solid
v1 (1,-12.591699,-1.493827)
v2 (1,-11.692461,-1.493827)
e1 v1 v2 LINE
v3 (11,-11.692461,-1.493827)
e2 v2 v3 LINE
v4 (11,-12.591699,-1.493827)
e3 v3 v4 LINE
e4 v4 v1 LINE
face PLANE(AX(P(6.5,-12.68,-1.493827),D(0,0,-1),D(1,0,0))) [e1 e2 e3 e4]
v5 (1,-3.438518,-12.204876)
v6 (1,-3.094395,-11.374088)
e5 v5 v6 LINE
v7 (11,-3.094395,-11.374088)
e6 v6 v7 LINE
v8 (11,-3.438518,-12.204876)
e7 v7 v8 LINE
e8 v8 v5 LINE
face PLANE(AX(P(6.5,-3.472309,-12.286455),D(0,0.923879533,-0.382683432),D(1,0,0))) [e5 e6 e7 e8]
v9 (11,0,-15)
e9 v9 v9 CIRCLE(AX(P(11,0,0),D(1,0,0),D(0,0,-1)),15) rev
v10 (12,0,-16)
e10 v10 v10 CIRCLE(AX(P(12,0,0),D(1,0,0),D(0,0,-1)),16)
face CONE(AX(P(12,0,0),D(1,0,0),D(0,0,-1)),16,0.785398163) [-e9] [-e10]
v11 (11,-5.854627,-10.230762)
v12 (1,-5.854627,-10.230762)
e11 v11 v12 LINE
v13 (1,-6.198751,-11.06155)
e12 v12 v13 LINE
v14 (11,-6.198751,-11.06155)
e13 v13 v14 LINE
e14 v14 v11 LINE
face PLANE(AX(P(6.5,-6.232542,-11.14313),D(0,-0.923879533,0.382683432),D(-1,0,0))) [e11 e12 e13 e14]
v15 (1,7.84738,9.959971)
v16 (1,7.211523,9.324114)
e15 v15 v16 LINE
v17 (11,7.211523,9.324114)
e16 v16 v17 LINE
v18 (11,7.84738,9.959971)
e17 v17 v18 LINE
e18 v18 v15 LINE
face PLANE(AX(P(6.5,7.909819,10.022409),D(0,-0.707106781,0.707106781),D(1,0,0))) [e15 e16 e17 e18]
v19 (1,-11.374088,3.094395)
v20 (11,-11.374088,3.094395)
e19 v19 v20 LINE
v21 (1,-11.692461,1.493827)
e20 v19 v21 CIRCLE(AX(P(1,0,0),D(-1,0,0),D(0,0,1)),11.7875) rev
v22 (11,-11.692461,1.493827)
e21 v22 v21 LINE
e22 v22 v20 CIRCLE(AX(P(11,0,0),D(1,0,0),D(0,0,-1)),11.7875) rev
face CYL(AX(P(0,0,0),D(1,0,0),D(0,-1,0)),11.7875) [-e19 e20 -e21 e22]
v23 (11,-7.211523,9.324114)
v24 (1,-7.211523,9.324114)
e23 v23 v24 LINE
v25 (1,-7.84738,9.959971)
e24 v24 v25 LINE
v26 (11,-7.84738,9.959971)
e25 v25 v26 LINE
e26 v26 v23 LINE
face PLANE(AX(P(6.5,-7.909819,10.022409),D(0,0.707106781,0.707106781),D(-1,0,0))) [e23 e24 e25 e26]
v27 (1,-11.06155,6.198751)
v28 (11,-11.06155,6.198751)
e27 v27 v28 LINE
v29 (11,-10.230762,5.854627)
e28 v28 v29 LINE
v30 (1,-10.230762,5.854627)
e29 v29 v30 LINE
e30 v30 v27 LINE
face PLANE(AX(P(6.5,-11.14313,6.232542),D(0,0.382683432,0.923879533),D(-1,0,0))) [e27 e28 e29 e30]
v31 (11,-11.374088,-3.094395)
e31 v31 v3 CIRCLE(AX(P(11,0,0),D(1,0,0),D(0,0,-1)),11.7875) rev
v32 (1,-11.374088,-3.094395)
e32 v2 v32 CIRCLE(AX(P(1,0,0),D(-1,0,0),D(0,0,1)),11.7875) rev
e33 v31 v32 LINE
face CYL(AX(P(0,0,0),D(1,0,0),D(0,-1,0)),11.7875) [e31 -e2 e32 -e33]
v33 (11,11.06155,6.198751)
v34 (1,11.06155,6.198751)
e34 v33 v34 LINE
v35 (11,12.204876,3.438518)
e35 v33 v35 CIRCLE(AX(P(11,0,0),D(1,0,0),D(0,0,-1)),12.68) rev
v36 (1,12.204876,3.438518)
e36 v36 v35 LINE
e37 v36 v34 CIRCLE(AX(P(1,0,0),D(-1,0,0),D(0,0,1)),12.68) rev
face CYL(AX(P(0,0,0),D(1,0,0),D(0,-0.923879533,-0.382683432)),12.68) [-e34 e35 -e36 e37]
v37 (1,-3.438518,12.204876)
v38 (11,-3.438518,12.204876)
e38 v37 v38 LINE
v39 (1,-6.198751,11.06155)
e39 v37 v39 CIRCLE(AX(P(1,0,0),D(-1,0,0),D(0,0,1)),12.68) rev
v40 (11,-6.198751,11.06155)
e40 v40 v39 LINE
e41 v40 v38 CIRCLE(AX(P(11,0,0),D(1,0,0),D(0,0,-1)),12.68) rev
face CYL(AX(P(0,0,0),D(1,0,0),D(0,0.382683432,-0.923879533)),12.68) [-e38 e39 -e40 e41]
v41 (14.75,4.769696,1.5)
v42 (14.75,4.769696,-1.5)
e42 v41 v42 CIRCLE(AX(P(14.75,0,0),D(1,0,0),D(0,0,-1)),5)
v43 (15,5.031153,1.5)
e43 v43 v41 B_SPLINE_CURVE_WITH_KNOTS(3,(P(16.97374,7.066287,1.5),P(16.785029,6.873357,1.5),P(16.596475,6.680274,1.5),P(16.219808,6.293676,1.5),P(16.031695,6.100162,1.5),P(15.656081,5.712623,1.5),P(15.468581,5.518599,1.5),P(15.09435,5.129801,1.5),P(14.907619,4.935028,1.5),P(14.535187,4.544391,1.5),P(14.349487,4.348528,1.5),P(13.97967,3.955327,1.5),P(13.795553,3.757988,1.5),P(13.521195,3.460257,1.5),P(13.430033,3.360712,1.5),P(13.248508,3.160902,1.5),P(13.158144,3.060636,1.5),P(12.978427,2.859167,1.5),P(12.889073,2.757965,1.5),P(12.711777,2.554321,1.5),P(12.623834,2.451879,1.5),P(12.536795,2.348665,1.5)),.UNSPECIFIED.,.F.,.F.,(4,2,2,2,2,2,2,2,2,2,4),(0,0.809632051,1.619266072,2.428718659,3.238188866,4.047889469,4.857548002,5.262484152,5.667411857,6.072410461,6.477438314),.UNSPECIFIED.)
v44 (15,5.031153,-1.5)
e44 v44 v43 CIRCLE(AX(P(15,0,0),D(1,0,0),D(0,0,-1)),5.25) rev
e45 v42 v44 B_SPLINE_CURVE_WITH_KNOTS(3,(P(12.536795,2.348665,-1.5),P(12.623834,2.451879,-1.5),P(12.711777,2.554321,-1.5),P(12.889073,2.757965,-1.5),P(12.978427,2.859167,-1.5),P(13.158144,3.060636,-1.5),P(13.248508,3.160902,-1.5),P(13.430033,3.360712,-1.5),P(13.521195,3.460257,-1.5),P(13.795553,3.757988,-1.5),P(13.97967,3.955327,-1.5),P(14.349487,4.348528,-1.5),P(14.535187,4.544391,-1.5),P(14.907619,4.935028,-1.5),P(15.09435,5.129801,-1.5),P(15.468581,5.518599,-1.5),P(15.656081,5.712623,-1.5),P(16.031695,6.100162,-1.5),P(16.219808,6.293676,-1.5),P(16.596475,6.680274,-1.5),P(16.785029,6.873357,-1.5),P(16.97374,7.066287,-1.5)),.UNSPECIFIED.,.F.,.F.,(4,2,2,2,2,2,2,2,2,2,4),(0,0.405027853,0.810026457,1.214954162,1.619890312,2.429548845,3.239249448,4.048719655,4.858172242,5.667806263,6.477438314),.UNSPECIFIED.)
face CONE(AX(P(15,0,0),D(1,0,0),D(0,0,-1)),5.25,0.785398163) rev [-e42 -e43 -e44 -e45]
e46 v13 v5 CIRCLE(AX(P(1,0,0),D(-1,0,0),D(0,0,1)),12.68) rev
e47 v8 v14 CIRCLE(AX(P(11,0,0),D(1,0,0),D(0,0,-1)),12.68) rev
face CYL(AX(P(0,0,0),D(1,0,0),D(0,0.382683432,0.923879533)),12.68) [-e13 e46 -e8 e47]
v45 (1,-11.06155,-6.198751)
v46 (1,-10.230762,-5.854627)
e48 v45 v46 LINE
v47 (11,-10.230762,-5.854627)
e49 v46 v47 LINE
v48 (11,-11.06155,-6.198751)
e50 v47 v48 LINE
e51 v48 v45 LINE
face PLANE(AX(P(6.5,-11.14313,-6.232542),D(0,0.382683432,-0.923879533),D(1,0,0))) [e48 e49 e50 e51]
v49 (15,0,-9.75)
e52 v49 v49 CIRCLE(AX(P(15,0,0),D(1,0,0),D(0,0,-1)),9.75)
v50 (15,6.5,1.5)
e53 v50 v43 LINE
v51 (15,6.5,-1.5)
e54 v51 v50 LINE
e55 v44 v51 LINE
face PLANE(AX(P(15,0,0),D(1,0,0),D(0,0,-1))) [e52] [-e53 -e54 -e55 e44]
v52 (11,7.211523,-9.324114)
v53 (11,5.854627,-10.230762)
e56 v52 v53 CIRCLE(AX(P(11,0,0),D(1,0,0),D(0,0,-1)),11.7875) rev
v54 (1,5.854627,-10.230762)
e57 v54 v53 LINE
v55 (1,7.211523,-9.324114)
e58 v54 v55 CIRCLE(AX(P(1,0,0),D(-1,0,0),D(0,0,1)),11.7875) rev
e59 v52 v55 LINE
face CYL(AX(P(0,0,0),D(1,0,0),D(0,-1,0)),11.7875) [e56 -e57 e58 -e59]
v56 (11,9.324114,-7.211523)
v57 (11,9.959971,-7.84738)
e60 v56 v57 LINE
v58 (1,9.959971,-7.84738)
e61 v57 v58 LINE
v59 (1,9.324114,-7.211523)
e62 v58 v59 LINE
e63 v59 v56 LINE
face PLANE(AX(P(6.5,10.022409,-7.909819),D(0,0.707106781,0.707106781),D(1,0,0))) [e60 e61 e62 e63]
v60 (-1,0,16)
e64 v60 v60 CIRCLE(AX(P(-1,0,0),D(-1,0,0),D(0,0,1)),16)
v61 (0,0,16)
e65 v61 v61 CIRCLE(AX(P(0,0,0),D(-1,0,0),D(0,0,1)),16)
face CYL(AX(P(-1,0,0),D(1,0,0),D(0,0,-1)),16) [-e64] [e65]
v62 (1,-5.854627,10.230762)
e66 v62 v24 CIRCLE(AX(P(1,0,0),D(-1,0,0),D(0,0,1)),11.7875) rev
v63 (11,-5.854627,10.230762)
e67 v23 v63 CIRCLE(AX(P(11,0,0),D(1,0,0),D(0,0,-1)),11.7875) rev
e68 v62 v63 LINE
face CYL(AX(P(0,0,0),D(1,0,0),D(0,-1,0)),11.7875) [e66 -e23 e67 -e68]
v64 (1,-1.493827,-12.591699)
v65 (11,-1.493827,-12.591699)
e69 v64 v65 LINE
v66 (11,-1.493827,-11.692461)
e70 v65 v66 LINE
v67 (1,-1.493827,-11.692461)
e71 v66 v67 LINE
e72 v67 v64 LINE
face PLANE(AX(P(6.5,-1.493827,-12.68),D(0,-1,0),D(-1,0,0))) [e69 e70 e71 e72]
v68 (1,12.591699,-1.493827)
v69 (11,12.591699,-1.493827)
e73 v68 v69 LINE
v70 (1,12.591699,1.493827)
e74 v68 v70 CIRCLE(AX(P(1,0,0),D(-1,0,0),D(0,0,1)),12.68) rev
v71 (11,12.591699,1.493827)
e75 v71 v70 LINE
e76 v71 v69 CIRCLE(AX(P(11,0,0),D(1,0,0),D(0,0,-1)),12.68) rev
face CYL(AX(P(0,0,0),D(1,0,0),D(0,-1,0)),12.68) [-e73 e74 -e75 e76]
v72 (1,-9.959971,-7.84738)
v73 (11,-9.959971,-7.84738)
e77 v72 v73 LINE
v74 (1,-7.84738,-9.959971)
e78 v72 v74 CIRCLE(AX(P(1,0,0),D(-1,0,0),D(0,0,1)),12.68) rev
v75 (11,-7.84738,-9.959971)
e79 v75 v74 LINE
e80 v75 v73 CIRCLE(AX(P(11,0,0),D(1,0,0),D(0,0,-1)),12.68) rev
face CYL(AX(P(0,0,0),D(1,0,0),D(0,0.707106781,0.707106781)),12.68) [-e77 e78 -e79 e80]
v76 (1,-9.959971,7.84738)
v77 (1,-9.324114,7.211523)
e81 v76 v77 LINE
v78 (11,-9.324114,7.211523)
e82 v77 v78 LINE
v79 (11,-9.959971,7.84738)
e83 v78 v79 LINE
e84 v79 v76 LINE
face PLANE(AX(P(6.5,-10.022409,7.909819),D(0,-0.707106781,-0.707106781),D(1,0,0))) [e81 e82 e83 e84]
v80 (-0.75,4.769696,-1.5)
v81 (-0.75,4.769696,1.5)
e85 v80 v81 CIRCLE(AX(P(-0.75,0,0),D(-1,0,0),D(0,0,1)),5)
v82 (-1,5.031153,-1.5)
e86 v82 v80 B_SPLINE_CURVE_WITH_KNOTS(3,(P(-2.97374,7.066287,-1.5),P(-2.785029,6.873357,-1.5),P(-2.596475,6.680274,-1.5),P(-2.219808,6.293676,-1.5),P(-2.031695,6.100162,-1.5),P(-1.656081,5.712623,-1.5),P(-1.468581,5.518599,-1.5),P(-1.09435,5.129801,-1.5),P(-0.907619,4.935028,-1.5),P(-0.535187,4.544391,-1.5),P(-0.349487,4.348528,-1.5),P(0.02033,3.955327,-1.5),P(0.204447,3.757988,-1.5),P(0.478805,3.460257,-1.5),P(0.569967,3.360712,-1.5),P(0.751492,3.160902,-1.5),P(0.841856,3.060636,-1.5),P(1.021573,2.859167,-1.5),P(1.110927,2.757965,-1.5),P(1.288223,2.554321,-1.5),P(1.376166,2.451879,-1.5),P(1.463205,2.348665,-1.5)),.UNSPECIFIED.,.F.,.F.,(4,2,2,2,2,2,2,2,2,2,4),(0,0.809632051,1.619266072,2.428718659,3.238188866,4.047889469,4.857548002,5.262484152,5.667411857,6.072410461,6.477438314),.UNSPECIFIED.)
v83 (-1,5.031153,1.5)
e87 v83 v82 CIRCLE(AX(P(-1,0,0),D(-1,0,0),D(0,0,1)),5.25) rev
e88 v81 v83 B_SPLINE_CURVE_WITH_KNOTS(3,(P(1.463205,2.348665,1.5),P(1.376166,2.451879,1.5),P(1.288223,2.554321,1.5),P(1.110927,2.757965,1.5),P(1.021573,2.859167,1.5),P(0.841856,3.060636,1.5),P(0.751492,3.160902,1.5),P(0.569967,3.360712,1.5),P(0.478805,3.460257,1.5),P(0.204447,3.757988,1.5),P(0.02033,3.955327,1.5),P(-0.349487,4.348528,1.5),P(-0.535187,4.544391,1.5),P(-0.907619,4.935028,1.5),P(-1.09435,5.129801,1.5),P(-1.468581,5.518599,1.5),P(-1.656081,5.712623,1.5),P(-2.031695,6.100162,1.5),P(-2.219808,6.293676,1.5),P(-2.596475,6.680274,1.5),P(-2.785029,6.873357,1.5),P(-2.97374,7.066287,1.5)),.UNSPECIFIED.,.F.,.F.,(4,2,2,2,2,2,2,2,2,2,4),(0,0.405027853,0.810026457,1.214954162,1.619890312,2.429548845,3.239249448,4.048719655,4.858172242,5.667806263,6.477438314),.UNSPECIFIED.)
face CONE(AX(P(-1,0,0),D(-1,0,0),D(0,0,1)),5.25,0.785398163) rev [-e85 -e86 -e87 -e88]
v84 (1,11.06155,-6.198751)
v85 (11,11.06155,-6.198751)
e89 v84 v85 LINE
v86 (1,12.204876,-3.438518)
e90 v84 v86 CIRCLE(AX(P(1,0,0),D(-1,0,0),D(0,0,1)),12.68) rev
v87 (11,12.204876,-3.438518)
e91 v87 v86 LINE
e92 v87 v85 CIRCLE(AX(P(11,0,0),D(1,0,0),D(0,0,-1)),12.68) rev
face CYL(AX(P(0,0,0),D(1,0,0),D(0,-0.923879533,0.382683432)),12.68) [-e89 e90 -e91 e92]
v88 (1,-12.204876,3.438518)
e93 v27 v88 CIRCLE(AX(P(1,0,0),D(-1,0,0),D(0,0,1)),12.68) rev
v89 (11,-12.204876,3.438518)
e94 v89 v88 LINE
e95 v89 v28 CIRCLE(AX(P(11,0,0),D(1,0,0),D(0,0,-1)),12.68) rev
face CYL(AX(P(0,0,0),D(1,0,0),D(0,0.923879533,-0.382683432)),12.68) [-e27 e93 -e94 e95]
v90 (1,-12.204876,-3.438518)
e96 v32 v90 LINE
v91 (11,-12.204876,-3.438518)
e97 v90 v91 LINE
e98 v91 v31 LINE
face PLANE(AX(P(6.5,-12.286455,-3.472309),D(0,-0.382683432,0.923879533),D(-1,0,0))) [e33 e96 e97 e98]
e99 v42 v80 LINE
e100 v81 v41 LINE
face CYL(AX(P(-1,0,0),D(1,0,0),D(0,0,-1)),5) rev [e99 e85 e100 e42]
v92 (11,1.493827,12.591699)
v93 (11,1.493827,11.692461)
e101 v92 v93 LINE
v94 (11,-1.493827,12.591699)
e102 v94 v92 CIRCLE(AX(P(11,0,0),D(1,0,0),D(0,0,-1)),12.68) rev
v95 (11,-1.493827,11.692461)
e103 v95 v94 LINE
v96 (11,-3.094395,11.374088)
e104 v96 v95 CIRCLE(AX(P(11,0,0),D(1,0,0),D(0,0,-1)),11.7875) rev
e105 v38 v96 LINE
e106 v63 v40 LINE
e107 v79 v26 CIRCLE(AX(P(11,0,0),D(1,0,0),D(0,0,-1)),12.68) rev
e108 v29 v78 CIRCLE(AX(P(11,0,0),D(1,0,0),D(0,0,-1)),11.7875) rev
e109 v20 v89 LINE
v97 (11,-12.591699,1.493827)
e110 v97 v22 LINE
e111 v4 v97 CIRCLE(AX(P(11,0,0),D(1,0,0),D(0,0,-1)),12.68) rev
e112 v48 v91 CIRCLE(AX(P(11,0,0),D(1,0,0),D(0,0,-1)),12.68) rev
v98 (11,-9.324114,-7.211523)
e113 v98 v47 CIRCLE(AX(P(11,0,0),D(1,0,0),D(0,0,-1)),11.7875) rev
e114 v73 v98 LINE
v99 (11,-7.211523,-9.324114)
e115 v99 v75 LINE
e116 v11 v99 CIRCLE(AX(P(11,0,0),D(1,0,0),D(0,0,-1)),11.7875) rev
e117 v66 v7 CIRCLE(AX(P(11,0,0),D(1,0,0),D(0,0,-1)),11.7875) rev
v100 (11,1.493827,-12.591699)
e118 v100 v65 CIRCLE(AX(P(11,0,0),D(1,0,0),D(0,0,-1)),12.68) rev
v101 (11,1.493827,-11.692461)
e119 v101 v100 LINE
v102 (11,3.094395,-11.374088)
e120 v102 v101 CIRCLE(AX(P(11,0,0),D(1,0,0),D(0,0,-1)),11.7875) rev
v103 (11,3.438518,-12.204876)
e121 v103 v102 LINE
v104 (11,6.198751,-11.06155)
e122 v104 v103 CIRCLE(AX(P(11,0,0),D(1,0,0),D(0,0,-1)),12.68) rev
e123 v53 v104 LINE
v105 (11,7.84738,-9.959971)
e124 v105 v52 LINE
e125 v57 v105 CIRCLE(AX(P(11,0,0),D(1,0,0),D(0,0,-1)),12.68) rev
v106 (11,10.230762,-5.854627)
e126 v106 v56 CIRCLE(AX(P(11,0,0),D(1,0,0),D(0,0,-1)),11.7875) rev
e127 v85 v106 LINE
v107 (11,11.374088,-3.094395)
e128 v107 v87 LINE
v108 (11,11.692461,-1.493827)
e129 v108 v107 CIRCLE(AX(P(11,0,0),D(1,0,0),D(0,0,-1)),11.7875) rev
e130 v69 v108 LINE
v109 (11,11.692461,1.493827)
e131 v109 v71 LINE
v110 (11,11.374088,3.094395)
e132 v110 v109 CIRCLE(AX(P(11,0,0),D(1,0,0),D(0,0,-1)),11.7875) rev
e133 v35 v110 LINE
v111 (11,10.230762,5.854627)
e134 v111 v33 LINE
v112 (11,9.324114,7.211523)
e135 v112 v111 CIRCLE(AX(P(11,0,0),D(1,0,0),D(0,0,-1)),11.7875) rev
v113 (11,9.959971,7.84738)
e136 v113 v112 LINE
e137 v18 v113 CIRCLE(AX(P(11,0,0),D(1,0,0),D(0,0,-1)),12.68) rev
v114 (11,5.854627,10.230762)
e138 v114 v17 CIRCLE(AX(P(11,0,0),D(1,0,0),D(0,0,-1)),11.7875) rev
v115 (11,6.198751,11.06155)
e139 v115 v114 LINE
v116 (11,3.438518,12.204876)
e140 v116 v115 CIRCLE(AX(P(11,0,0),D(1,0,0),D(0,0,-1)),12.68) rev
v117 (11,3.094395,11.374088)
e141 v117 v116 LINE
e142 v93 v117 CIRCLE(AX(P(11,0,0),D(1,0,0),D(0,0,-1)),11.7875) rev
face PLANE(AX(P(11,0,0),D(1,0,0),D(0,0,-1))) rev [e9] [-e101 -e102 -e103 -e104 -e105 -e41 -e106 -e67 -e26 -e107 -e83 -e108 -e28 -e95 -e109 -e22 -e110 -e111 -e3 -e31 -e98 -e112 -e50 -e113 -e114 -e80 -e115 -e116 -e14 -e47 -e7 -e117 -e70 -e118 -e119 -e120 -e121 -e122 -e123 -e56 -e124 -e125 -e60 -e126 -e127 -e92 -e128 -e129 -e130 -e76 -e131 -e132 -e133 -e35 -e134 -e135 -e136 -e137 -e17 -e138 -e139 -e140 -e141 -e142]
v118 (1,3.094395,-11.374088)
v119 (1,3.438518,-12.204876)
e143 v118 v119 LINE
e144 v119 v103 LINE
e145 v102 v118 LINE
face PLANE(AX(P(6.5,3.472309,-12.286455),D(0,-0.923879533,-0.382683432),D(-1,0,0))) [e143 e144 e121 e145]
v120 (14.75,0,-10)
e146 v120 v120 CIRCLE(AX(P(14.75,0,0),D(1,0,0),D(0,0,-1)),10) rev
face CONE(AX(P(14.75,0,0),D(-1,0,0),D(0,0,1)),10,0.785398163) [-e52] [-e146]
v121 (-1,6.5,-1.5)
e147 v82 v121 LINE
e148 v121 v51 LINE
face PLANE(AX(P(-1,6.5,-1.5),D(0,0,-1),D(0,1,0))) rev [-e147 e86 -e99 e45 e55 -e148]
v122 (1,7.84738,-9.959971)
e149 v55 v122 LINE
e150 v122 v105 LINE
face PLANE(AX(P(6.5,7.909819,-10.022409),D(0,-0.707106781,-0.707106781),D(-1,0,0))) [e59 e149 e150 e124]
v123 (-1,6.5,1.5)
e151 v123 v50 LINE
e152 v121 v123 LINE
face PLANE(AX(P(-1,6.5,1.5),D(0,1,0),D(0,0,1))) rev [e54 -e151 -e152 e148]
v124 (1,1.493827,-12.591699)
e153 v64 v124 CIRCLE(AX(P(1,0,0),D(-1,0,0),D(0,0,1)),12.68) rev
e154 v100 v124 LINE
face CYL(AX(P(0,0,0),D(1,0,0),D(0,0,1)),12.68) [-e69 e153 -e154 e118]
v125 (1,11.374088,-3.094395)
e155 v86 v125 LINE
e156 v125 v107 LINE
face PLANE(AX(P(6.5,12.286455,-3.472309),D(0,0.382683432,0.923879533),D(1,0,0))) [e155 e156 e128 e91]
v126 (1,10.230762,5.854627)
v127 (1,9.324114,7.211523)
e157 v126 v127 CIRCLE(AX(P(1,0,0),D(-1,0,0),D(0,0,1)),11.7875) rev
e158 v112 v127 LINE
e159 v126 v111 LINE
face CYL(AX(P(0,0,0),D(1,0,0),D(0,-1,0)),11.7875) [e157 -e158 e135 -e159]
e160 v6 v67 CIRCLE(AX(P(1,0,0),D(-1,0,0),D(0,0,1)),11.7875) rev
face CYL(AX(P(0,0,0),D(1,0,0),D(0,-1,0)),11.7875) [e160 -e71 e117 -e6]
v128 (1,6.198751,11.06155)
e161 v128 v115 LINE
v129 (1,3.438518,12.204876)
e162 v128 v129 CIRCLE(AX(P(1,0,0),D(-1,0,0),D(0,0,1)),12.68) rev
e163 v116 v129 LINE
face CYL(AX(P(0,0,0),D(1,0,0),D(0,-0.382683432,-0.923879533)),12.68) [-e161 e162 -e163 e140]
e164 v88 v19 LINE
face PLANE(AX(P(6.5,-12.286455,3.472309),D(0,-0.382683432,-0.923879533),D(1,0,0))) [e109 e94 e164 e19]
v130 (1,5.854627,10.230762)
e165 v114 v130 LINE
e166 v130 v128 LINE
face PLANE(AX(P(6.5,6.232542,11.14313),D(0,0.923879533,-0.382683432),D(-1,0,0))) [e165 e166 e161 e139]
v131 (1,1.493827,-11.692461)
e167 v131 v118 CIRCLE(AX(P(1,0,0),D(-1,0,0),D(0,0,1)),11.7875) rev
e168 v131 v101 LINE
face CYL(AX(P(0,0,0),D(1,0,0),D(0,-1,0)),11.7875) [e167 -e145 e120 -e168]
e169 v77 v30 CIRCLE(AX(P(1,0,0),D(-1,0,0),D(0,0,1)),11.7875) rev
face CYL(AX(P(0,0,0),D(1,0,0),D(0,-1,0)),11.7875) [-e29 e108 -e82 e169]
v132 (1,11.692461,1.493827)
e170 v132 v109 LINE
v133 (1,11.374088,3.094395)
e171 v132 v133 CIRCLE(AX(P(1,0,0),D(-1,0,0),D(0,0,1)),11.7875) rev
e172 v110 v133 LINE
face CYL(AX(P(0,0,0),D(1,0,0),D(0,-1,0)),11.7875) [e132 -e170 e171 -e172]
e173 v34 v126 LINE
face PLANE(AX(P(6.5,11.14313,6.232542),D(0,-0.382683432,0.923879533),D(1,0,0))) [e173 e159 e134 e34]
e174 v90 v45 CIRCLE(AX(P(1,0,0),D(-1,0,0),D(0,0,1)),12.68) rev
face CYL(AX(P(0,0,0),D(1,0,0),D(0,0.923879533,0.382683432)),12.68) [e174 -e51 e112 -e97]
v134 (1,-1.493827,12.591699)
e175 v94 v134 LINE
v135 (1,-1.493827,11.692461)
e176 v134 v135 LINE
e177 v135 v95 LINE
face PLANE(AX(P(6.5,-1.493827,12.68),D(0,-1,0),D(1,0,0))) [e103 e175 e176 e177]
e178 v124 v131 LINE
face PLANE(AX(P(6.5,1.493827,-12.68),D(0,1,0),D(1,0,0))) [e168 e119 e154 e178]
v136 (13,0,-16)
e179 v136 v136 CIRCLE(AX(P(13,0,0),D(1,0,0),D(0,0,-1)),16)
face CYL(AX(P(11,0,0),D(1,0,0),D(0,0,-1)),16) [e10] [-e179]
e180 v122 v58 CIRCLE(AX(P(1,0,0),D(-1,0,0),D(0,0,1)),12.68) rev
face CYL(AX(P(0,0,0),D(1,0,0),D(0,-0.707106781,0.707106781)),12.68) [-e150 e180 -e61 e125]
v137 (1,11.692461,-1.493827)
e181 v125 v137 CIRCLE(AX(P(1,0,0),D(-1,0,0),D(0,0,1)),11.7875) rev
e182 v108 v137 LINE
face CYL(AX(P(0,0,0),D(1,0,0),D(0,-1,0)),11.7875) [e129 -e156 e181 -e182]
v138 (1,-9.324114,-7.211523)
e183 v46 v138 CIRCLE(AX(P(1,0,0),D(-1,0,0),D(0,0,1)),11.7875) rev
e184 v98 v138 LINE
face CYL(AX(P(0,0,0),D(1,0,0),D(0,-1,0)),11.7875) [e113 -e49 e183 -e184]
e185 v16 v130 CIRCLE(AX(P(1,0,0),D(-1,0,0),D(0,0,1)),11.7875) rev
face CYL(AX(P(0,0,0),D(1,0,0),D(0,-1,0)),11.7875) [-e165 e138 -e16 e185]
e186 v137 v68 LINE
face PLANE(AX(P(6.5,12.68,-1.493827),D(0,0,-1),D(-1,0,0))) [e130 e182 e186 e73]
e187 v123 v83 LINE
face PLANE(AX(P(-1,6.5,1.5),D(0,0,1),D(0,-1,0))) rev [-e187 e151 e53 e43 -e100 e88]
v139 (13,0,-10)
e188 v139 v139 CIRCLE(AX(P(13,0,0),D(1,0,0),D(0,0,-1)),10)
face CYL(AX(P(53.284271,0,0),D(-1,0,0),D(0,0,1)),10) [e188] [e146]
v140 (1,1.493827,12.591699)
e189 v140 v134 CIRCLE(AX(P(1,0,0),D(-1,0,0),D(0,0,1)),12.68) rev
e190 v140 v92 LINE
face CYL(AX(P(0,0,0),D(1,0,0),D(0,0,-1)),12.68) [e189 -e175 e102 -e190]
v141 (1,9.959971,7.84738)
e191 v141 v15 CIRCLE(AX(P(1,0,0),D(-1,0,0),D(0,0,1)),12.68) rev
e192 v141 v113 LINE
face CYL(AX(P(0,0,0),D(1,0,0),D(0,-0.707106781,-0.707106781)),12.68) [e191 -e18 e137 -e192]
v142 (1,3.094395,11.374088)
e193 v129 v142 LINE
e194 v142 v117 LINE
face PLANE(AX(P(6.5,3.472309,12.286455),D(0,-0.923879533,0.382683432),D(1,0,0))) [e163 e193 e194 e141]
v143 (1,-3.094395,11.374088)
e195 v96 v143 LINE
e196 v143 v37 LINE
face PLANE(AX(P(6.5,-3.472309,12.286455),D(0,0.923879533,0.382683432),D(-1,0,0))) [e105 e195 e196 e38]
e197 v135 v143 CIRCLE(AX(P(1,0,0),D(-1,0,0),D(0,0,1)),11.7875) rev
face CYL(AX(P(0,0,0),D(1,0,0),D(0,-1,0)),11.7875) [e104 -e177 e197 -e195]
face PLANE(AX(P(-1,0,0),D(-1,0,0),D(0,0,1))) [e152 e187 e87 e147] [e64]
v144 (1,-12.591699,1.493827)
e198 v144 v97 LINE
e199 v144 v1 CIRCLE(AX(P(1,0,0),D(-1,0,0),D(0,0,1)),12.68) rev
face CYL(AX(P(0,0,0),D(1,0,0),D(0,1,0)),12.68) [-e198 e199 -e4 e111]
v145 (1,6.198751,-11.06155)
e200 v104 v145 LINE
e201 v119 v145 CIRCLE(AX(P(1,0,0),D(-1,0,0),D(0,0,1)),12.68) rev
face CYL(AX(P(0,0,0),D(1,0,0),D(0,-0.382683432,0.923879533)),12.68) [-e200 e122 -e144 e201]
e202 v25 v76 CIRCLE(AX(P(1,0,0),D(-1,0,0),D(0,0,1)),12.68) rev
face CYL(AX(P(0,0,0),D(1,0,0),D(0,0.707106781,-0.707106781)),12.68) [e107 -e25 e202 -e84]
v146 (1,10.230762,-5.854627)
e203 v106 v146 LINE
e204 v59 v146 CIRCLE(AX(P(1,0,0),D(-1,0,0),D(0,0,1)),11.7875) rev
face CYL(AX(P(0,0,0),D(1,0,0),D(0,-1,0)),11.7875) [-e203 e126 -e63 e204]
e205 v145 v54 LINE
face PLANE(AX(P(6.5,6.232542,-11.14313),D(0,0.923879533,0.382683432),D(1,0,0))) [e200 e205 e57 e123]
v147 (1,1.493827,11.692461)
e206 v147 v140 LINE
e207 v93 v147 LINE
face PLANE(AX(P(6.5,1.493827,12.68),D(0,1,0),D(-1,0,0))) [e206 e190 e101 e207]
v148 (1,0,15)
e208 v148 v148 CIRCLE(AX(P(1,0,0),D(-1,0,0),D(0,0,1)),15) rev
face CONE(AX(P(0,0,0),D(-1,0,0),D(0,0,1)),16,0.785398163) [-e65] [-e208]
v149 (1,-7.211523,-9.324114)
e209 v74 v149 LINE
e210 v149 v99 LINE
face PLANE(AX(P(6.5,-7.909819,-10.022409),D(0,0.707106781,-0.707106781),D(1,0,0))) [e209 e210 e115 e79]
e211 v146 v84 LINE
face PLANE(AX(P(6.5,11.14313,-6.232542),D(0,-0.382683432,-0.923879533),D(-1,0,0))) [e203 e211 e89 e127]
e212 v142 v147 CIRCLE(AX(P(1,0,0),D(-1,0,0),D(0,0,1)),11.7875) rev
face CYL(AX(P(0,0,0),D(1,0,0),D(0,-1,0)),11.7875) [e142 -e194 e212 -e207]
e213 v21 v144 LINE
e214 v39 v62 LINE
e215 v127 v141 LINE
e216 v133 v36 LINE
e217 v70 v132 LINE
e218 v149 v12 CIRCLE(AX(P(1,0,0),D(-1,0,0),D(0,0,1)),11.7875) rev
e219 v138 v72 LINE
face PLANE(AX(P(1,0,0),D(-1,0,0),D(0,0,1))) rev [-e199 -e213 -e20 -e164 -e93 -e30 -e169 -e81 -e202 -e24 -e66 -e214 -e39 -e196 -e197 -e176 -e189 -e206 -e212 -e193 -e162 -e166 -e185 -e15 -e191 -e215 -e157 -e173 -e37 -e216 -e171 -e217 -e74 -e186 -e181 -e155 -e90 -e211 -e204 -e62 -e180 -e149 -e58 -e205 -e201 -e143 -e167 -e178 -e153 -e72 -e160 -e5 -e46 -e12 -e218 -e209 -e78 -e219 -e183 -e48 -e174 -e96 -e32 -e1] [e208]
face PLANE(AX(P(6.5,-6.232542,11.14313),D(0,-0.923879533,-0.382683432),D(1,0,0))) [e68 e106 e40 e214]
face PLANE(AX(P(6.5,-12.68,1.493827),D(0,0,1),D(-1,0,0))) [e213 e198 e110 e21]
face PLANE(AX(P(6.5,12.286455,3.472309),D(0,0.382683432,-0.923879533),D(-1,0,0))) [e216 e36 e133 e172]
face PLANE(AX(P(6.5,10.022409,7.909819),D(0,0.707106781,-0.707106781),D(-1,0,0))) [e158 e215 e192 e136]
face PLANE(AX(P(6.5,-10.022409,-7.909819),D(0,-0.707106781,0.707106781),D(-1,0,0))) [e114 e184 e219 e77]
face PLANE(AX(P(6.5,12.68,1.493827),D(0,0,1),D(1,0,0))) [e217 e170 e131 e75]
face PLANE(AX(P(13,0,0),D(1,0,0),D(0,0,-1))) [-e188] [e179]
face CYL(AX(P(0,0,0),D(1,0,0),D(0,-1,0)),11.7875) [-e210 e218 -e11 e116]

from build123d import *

# Parameters (mm, degrees)
BOSS_EXTRUDE1_START       = -13
BOSS_EXTRUDE1_DEPTH       = 14
BOSS_EXTRUDE1_START_2     = -25
BOSS_EXTRUDE1_2_OUTLINE_R = 9
BOSS_EXTRUDE1_2_DEPTH     = 12
BOSS_EXTRUDE1_START_3     = -1
BOSS_EXTRUDE1_3_OUTLINE_R = 16
BOSS_EXTRUDE1_3_DEPTH     = 2
BOSS_EXTRUDE1_4_OUTLINE_R = 14.25
BOSS_EXTRUDE1_4_DEPTH     = 0.9999999
SKETCH5_R                 = 16
BOSS_EXTRUDE3_DEPTH       = 2
SKETCH6_R                 = 10
BOSS_EXTRUDE4_DEPTH       = 12
CHAMFER1_SIZE             = 1
CUT_EXTRUDE1_START        = -10
SKETCH2_R                 = 10
SKETCH2_R_2               = 7.5
CUT_EXTRUDE1_DEPTH        = 10
CUT_EXTRUDE2_DEPTH        = 28.712812921
CUT_EXTRUDE2_DEPTH_BACK   = 28.712812921
SKETCH4_R                 = 5
CUT_EXTRUDE3_START        = -10
SKETCH7_R                 = 7.5
CUT_EXTRUDE3_DEPTH        = 10
CHAMFER2_SIZE             = 0.25
SKETCH8_W                 = 3
SKETCH8_H                 = 3
CUT_EXTRUDE4_DEPTH        = 28.712812921


with BuildPart() as part:
    # Boss-Extrude1: read off the stored shape, not the designer's step
    # Boss-Extrude1 outline → Boss-Extrude1 (new body)
    with BuildSketch(Plane.ZY.offset(BOSS_EXTRUDE1_START)):
        with BuildLine():
            ThreePointArc((-1.493827307, 11.692460658), (-2.299627171, 11.561006493), (-3.094394503, 11.374088047))
            Line((-3.094394503, 11.374088047), (-3.438518062, 12.20487581))
            ThreePointArc((-3.438518062, 12.20487581), (-4.852425922, 11.714792472), (-6.19875101, 11.061549888))
            Line((-6.19875101, 11.061549888), (-5.854627451, 10.230762125))
            ThreePointArc((-5.854627451, 10.230762125), (-6.548784122, 9.800948055), (-7.211522801, 9.324113638))
            Line((-7.211522801, 9.324113638), (-7.847380226, 9.959971063))
            ThreePointArc((-7.847380226, 9.959971063), (-8.966113985, 8.966113985), (-9.959971063, 7.847380226))
            Line((-9.959971063, 7.847380226), (-9.324113638, 7.211522801))
            ThreePointArc((-9.324113638, 7.211522801), (-9.800948055, 6.548784122), (-10.230762125, 5.854627451))
            Line((-10.230762125, 5.854627451), (-11.061549888, 6.19875101))
            ThreePointArc((-11.061549888, 6.19875101), (-11.714792472, 4.852425922), (-12.20487581, 3.438518062))
            Line((-12.20487581, 3.438518062), (-11.374088047, 3.094394503))
            ThreePointArc((-11.374088047, 3.094394503), (-11.561006493, 2.299627171), (-11.692460658, 1.493827307))
            Line((-11.692460658, 1.493827307), (-12.591698852, 1.493827307))
            ThreePointArc((-12.591698852, 1.493827307), (-12.68, 0), (-12.591698852, -1.493827307))
            Line((-12.591698852, -1.493827307), (-11.692460658, -1.493827307))
            ThreePointArc((-11.692460658, -1.493827307), (-11.561006493, -2.299627171), (-11.374088047, -3.094394503))
            Line((-11.374088047, -3.094394503), (-12.20487581, -3.438518062))
            ThreePointArc((-12.20487581, -3.438518062), (-11.714792472, -4.852425922), (-11.061549888, -6.19875101))
            Line((-11.061549888, -6.19875101), (-10.230762125, -5.854627451))
            ThreePointArc((-10.230762125, -5.854627451), (-9.800948055, -6.548784122), (-9.324113638, -7.211522801))
            Line((-9.324113638, -7.211522801), (-9.959971063, -7.847380226))
            ThreePointArc((-9.959971063, -7.847380226), (-8.966113985, -8.966113985), (-7.847380226, -9.959971063))
            Line((-7.847380226, -9.959971063), (-7.211522801, -9.324113638))
            ThreePointArc((-7.211522801, -9.324113638), (-6.548784122, -9.800948055), (-5.854627451, -10.230762125))
            Line((-5.854627451, -10.230762125), (-6.19875101, -11.061549888))
            ThreePointArc((-6.19875101, -11.061549888), (-4.852425922, -11.714792472), (-3.438518062, -12.20487581))
            Line((-3.438518062, -12.20487581), (-3.094394503, -11.374088047))
            ThreePointArc((-3.094394503, -11.374088047), (-2.299627171, -11.561006493), (-1.493827307, -11.692460658))
            Line((-1.493827307, -11.692460658), (-1.493827307, -12.591698852))
            ThreePointArc((-1.493827307, -12.591698852), (0, -12.68), (1.493827307, -12.591698852))
            Line((1.493827307, -12.591698852), (1.493827307, -11.692460658))
            ThreePointArc((1.493827307, -11.692460658), (2.299627171, -11.561006493), (3.094394503, -11.374088047))
            Line((3.094394503, -11.374088047), (3.438518062, -12.20487581))
            ThreePointArc((3.438518062, -12.20487581), (4.852425922, -11.714792472), (6.19875101, -11.061549888))
            Line((6.19875101, -11.061549888), (5.854627451, -10.230762125))
            ThreePointArc((5.854627451, -10.230762125), (6.548784122, -9.800948055), (7.211522801, -9.324113638))
            Line((7.211522801, -9.324113638), (7.847380226, -9.959971063))
            ThreePointArc((7.847380226, -9.959971063), (8.966113985, -8.966113985), (9.959971063, -7.847380226))
            Line((9.959971063, -7.847380226), (9.324113638, -7.211522801))
            ThreePointArc((9.324113638, -7.211522801), (9.800948055, -6.548784122), (10.230762125, -5.854627451))
            Line((10.230762125, -5.854627451), (11.061549888, -6.19875101))
            ThreePointArc((11.061549888, -6.19875101), (11.714792472, -4.852425922), (12.20487581, -3.438518062))
            Line((12.20487581, -3.438518062), (11.374088047, -3.094394503))
            ThreePointArc((11.374088047, -3.094394503), (11.561006493, -2.299627171), (11.692460658, -1.493827307))
            Line((11.692460658, -1.493827307), (12.591698852, -1.493827307))
            ThreePointArc((12.591698852, -1.493827307), (12.68, 0), (12.591698852, 1.493827307))
            Line((12.591698852, 1.493827307), (11.692460658, 1.493827307))
            ThreePointArc((11.692460658, 1.493827307), (11.561006493, 2.299627171), (11.374088047, 3.094394503))
            Line((11.374088047, 3.094394503), (12.20487581, 3.438518062))
            ThreePointArc((12.20487581, 3.438518062), (11.714792472, 4.852425922), (11.061549888, 6.19875101))
            Line((11.061549888, 6.19875101), (10.230762125, 5.854627451))
            ThreePointArc((10.230762125, 5.854627451), (9.800948055, 6.548784122), (9.324113638, 7.211522801))
            Line((9.324113638, 7.211522801), (9.959971063, 7.847380226))
            ThreePointArc((9.959971063, 7.847380226), (8.966113985, 8.966113985), (7.847380226, 9.959971063))
            Line((7.847380226, 9.959971063), (7.211522801, 9.324113638))
            ThreePointArc((7.211522801, 9.324113638), (6.548784122, 9.800948055), (5.854627451, 10.230762125))
            Line((5.854627451, 10.230762125), (6.19875101, 11.061549888))
            ThreePointArc((6.19875101, 11.061549888), (4.852425922, 11.714792472), (3.438518062, 12.20487581))
            Line((3.438518062, 12.20487581), (3.094394503, 11.374088047))
            ThreePointArc((3.094394503, 11.374088047), (2.299627171, 11.561006493), (1.493827307, 11.692460658))
            Line((1.493827307, 11.692460658), (1.493827307, 12.591698852))
            ThreePointArc((1.493827307, 12.591698852), (0, 12.68), (-1.493827307, 12.591698852))
            Line((-1.493827307, 12.591698852), (-1.493827307, 11.692460658))
        make_face()
    extrude(amount=BOSS_EXTRUDE1_DEPTH)

    # Boss-Extrude1 2 outline → Boss-Extrude1 2 (add)
    with BuildSketch(Plane.ZY.offset(BOSS_EXTRUDE1_START_2)):
        Circle(BOSS_EXTRUDE1_2_OUTLINE_R)
    extrude(amount=BOSS_EXTRUDE1_2_DEPTH)

    # Boss-Extrude1 3 outline → Boss-Extrude1 3 (add)
    with BuildSketch(Plane.ZY.offset(BOSS_EXTRUDE1_START_3)):
        Circle(BOSS_EXTRUDE1_3_OUTLINE_R)
        with BuildLine():
            Line((-3.438518062, 12.20487581), (-3.094394503, 11.374088047))
            ThreePointArc((-3.094394503, 11.374088047), (-2.299627171, 11.561006493), (-1.493827307, 11.692460658))
            Line((-1.493827307, 11.692460658), (-1.493827307, 12.591698852))
            ThreePointArc((-1.493827307, 12.591698852), (0, 12.68), (1.493827307, 12.591698852))
            Line((1.493827307, 12.591698852), (1.493827307, 11.692460658))
            ThreePointArc((1.493827307, 11.692460658), (2.299627171, 11.561006493), (3.094394503, 11.374088047))
            Line((3.094394503, 11.374088047), (3.438518062, 12.20487581))
            ThreePointArc((3.438518062, 12.20487581), (4.852425922, 11.714792472), (6.19875101, 11.061549888))
            Line((6.19875101, 11.061549888), (5.854627451, 10.230762125))
            ThreePointArc((5.854627451, 10.230762125), (6.548784122, 9.800948055), (7.211522801, 9.324113638))
            Line((7.211522801, 9.324113638), (7.847380226, 9.959971063))
            ThreePointArc((7.847380226, 9.959971063), (8.966113985, 8.966113985), (9.959971063, 7.847380226))
            Line((9.959971063, 7.847380226), (9.324113638, 7.211522801))
            ThreePointArc((9.324113638, 7.211522801), (9.800948055, 6.548784122), (10.230762125, 5.854627451))
            Line((10.230762125, 5.854627451), (11.061549888, 6.19875101))
            ThreePointArc((11.061549888, 6.19875101), (11.714792472, 4.852425922), (12.20487581, 3.438518062))
            Line((12.20487581, 3.438518062), (11.374088047, 3.094394503))
            ThreePointArc((11.374088047, 3.094394503), (11.561006493, 2.299627171), (11.692460658, 1.493827307))
            Line((11.692460658, 1.493827307), (12.591698852, 1.493827307))
            ThreePointArc((12.591698852, 1.493827307), (12.68, 0), (12.591698852, -1.493827307))
            Line((12.591698852, -1.493827307), (11.692460658, -1.493827307))
            ThreePointArc((11.692460658, -1.493827307), (11.561006493, -2.299627171), (11.374088047, -3.094394503))
            Line((11.374088047, -3.094394503), (12.20487581, -3.438518062))
            ThreePointArc((12.20487581, -3.438518062), (11.714792472, -4.852425922), (11.061549888, -6.19875101))
            Line((11.061549888, -6.19875101), (10.230762125, -5.854627451))
            ThreePointArc((10.230762125, -5.854627451), (9.800948055, -6.548784122), (9.324113638, -7.211522801))
            Line((9.324113638, -7.211522801), (9.959971063, -7.847380226))
            ThreePointArc((9.959971063, -7.847380226), (8.966113985, -8.966113985), (7.847380226, -9.959971063))
            Line((7.847380226, -9.959971063), (7.211522801, -9.324113638))
            ThreePointArc((7.211522801, -9.324113638), (6.548784122, -9.800948055), (5.854627451, -10.230762125))
            Line((5.854627451, -10.230762125), (6.19875101, -11.061549888))
            ThreePointArc((6.19875101, -11.061549888), (4.852425922, -11.714792472), (3.438518062, -12.20487581))
            Line((3.438518062, -12.20487581), (3.094394503, -11.374088047))
            ThreePointArc((3.094394503, -11.374088047), (2.299627171, -11.561006493), (1.493827307, -11.692460658))
            Line((1.493827307, -11.692460658), (1.493827307, -12.591698852))
            ThreePointArc((1.493827307, -12.591698852), (0, -12.68), (-1.493827307, -12.591698852))
            Line((-1.493827307, -12.591698852), (-1.493827307, -11.692460658))
            ThreePointArc((-1.493827307, -11.692460658), (-2.299627171, -11.561006493), (-3.094394503, -11.374088047))
            Line((-3.094394503, -11.374088047), (-3.438518062, -12.20487581))
            ThreePointArc((-3.438518062, -12.20487581), (-4.852425922, -11.714792472), (-6.19875101, -11.061549888))
            Line((-6.19875101, -11.061549888), (-5.854627451, -10.230762125))
            ThreePointArc((-5.854627451, -10.230762125), (-6.548784122, -9.800948055), (-7.211522801, -9.324113638))
            Line((-7.211522801, -9.324113638), (-7.847380226, -9.959971063))
            ThreePointArc((-7.847380226, -9.959971063), (-8.966113985, -8.966113985), (-9.959971063, -7.847380226))
            Line((-9.959971063, -7.847380226), (-9.324113638, -7.211522801))
            ThreePointArc((-9.324113638, -7.211522801), (-9.800948055, -6.548784122), (-10.230762125, -5.854627451))
            Line((-10.230762125, -5.854627451), (-11.061549888, -6.19875101))
            ThreePointArc((-11.061549888, -6.19875101), (-11.714792472, -4.852425922), (-12.20487581, -3.438518062))
            Line((-12.20487581, -3.438518062), (-11.374088047, -3.094394503))
            ThreePointArc((-11.374088047, -3.094394503), (-11.561006493, -2.299627171), (-11.692460658, -1.493827307))
            Line((-11.692460658, -1.493827307), (-12.591698852, -1.493827307))
            ThreePointArc((-12.591698852, -1.493827307), (-12.68, 0), (-12.591698852, 1.493827307))
            Line((-12.591698852, 1.493827307), (-11.692460658, 1.493827307))
            ThreePointArc((-11.692460658, 1.493827307), (-11.561006493, 2.299627171), (-11.374088047, 3.094394503))
            Line((-11.374088047, 3.094394503), (-12.20487581, 3.438518062))
            ThreePointArc((-12.20487581, 3.438518062), (-11.714792472, 4.852425922), (-11.061549888, 6.19875101))
            Line((-11.061549888, 6.19875101), (-10.230762125, 5.854627451))
            ThreePointArc((-10.230762125, 5.854627451), (-9.800948055, 6.548784122), (-9.324113638, 7.211522801))
            Line((-9.324113638, 7.211522801), (-9.959971063, 7.847380226))
            ThreePointArc((-9.959971063, 7.847380226), (-8.966113985, 8.966113985), (-7.847380226, 9.959971063))
            Line((-7.847380226, 9.959971063), (-7.211522801, 9.324113638))
            ThreePointArc((-7.211522801, 9.324113638), (-6.548784122, 9.800948055), (-5.854627451, 10.230762125))
            Line((-5.854627451, 10.230762125), (-6.19875101, 11.061549888))
            ThreePointArc((-6.19875101, 11.061549888), (-4.852425922, 11.714792472), (-3.438518062, 12.20487581))
        make_face(mode=Mode.SUBTRACT)
    extrude(amount=BOSS_EXTRUDE1_3_DEPTH)

    # Boss-Extrude1 4 outline → Boss-Extrude1 4 (add)
    with BuildSketch(Plane.ZY.offset(BOSS_EXTRUDE1_START)):
        Circle(BOSS_EXTRUDE1_4_OUTLINE_R)
        with BuildLine():
            Line((-3.438518062, 12.20487581), (-3.094394503, 11.374088047))
            ThreePointArc((-3.094394503, 11.374088047), (-2.299627171, 11.561006493), (-1.493827307, 11.692460658))
            Line((-1.493827307, 11.692460658), (-1.493827307, 12.591698852))
            ThreePointArc((-1.493827307, 12.591698852), (0, 12.68), (1.493827307, 12.591698852))
            Line((1.493827307, 12.591698852), (1.493827307, 11.692460658))
            ThreePointArc((1.493827307, 11.692460658), (2.299627171, 11.561006493), (3.094394503, 11.374088047))
            Line((3.094394503, 11.374088047), (3.438518062, 12.20487581))
            ThreePointArc((3.438518062, 12.20487581), (4.852425922, 11.714792472), (6.19875101, 11.061549888))
            Line((6.19875101, 11.061549888), (5.854627451, 10.230762125))
            ThreePointArc((5.854627451, 10.230762125), (6.548784122, 9.800948055), (7.211522801, 9.324113638))
            Line((7.211522801, 9.324113638), (7.847380226, 9.959971063))
            ThreePointArc((7.847380226, 9.959971063), (8.966113985, 8.966113985), (9.959971063, 7.847380226))
            Line((9.959971063, 7.847380226), (9.324113638, 7.211522801))
            ThreePointArc((9.324113638, 7.211522801), (9.800948055, 6.548784122), (10.230762125, 5.854627451))
            Line((10.230762125, 5.854627451), (11.061549888, 6.19875101))
            ThreePointArc((11.061549888, 6.19875101), (11.714792472, 4.852425922), (12.20487581, 3.438518062))
            Line((12.20487581, 3.438518062), (11.374088047, 3.094394503))
            ThreePointArc((11.374088047, 3.094394503), (11.561006493, 2.299627171), (11.692460658, 1.493827307))
            Line((11.692460658, 1.493827307), (12.591698852, 1.493827307))
            ThreePointArc((12.591698852, 1.493827307), (12.68, 0), (12.591698852, -1.493827307))
            Line((12.591698852, -1.493827307), (11.692460658, -1.493827307))
            ThreePointArc((11.692460658, -1.493827307), (11.561006493, -2.299627171), (11.374088047, -3.094394503))
            Line((11.374088047, -3.094394503), (12.20487581, -3.438518062))
            ThreePointArc((12.20487581, -3.438518062), (11.714792472, -4.852425922), (11.061549888, -6.19875101))
            Line((11.061549888, -6.19875101), (10.230762125, -5.854627451))
            ThreePointArc((10.230762125, -5.854627451), (9.800948055, -6.548784122), (9.324113638, -7.211522801))
            Line((9.324113638, -7.211522801), (9.959971063, -7.847380226))
            ThreePointArc((9.959971063, -7.847380226), (8.966113985, -8.966113985), (7.847380226, -9.959971063))
            Line((7.847380226, -9.959971063), (7.211522801, -9.324113638))
            ThreePointArc((7.211522801, -9.324113638), (6.548784122, -9.800948055), (5.854627451, -10.230762125))
            Line((5.854627451, -10.230762125), (6.19875101, -11.061549888))
            ThreePointArc((6.19875101, -11.061549888), (4.852425922, -11.714792472), (3.438518062, -12.20487581))
            Line((3.438518062, -12.20487581), (3.094394503, -11.374088047))
            ThreePointArc((3.094394503, -11.374088047), (2.299627171, -11.561006493), (1.493827307, -11.692460658))
            Line((1.493827307, -11.692460658), (1.493827307, -12.591698852))
            ThreePointArc((1.493827307, -12.591698852), (0, -12.68), (-1.493827307, -12.591698852))
            Line((-1.493827307, -12.591698852), (-1.493827307, -11.692460658))
            ThreePointArc((-1.493827307, -11.692460658), (-2.299627171, -11.561006493), (-3.094394503, -11.374088047))
            Line((-3.094394503, -11.374088047), (-3.438518062, -12.20487581))
            ThreePointArc((-3.438518062, -12.20487581), (-4.852425922, -11.714792472), (-6.19875101, -11.061549888))
            Line((-6.19875101, -11.061549888), (-5.854627451, -10.230762125))
            ThreePointArc((-5.854627451, -10.230762125), (-6.548784122, -9.800948055), (-7.211522801, -9.324113638))
            Line((-7.211522801, -9.324113638), (-7.847380226, -9.959971063))
            ThreePointArc((-7.847380226, -9.959971063), (-8.966113985, -8.966113985), (-9.959971063, -7.847380226))
            Line((-9.959971063, -7.847380226), (-9.324113638, -7.211522801))
            ThreePointArc((-9.324113638, -7.211522801), (-9.800948055, -6.548784122), (-10.230762125, -5.854627451))
            Line((-10.230762125, -5.854627451), (-11.061549888, -6.19875101))
            ThreePointArc((-11.061549888, -6.19875101), (-11.714792472, -4.852425922), (-12.20487581, -3.438518062))
            Line((-12.20487581, -3.438518062), (-11.374088047, -3.094394503))
            ThreePointArc((-11.374088047, -3.094394503), (-11.561006493, -2.299627171), (-11.692460658, -1.493827307))
            Line((-11.692460658, -1.493827307), (-12.591698852, -1.493827307))
            ThreePointArc((-12.591698852, -1.493827307), (-12.68, 0), (-12.591698852, 1.493827307))
            Line((-12.591698852, 1.493827307), (-11.692460658, 1.493827307))
            ThreePointArc((-11.692460658, 1.493827307), (-11.561006493, 2.299627171), (-11.374088047, 3.094394503))
            Line((-11.374088047, 3.094394503), (-12.20487581, 3.438518062))
            ThreePointArc((-12.20487581, 3.438518062), (-11.714792472, 4.852425922), (-11.061549888, 6.19875101))
            Line((-11.061549888, 6.19875101), (-10.230762125, 5.854627451))
            ThreePointArc((-10.230762125, 5.854627451), (-9.800948055, 6.548784122), (-9.324113638, 7.211522801))
            Line((-9.324113638, 7.211522801), (-9.959971063, 7.847380226))
            ThreePointArc((-9.959971063, 7.847380226), (-8.966113985, 8.966113985), (-7.847380226, 9.959971063))
            Line((-7.847380226, 9.959971063), (-7.211522801, 9.324113638))
            ThreePointArc((-7.211522801, 9.324113638), (-6.548784122, 9.800948055), (-5.854627451, 10.230762125))
            Line((-5.854627451, 10.230762125), (-6.19875101, 11.061549888))
            ThreePointArc((-6.19875101, 11.061549888), (-4.852425922, 11.714792472), (-3.438518062, 12.20487581))
        make_face(mode=Mode.SUBTRACT)
    extrude(amount=BOSS_EXTRUDE1_4_DEPTH)

    # Boss-Extrude1 5 outline → Boss-Extrude1 5 (revolve)
    with BuildSketch(Plane.YX):
        Polygon((11.7875, 12.0000001), (11.7875, 11), (13.25, 11), (14.25, 12), align=None)
    revolve(axis=Axis((0, 0, 0), (1, 0, 0)))

    # Sketch5 → Boss-Extrude3 (add)
    with BuildSketch(Plane(origin=(13, 0, 0), x_dir=(0, 0, -1), z_dir=(1, 0, 0))):
        with Locations(Location((0, 0, 0), (0, 0, 180))):
            Circle(SKETCH5_R)
    extrude(amount=-BOSS_EXTRUDE3_DEPTH)

    # Sketch6 → Boss-Extrude4 (add)
    with BuildSketch(Plane(origin=(13, 0, 0), x_dir=(0, 0, -1), z_dir=(1, 0, 0))):
        Circle(SKETCH6_R)
    extrude(amount=BOSS_EXTRUDE4_DEPTH)

    # Chamfer1
    chamfer1_edges = [part.edges().sort_by_distance(p)[0] for p in [
        (1, 0, -16),
        (11, 0, -16),
    ]]
    chamfer(chamfer1_edges, length=CHAMFER1_SIZE)

    # Sketch2 → Cut-Extrude1 (cut)
    with BuildSketch(Plane(origin=(25, 0, 0), x_dir=(0, 0, -1), z_dir=(1, 0, 0)).offset(CUT_EXTRUDE1_START)):
        Circle(SKETCH2_R)
        Circle(SKETCH2_R_2, mode=Mode.SUBTRACT)
    extrude(amount=CUT_EXTRUDE1_DEPTH, mode=Mode.SUBTRACT)

    # Sketch4 → Cut-Extrude2 (cut, two sides: drawn at the far end of the back side and taken through both)
    with BuildSketch(Plane(origin=(15, 0, 0), x_dir=(0, 0, -1), z_dir=(1, 0, 0)).offset(-CUT_EXTRUDE2_DEPTH_BACK)):
        Circle(SKETCH4_R)
    extrude(amount=CUT_EXTRUDE2_DEPTH + CUT_EXTRUDE2_DEPTH_BACK, mode=Mode.SUBTRACT)

    # Sketch7 → Cut-Extrude3 (cut)
    with BuildSketch(Plane(origin=(25, 0, 0), x_dir=(0, 0, -1), z_dir=(1, 0, 0)).offset(CUT_EXTRUDE3_START)):
        Circle(SKETCH7_R)
    extrude(amount=CUT_EXTRUDE3_DEPTH, mode=Mode.SUBTRACT)

    # Chamfer2
    chamfer2_edges = [part.edges().sort_by_distance(p)[0] for p in [
        (15, 0, 10),
        (-1, 0, 5),
        (15, 0, 5),
    ]]
    chamfer(chamfer2_edges, length=CHAMFER2_SIZE)

    # Sketch8 → Cut-Extrude4 (cut, through all)
    with BuildSketch(Plane(origin=(15, 0, 0), x_dir=(0, 0, -1), z_dir=(1, 0, 0))):
        with Locations((0, 5)):
            Rectangle(SKETCH8_W, SKETCH8_H)
    extrude(amount=-CUT_EXTRUDE4_DEPTH, mode=Mode.SUBTRACT)


solid = part.part
